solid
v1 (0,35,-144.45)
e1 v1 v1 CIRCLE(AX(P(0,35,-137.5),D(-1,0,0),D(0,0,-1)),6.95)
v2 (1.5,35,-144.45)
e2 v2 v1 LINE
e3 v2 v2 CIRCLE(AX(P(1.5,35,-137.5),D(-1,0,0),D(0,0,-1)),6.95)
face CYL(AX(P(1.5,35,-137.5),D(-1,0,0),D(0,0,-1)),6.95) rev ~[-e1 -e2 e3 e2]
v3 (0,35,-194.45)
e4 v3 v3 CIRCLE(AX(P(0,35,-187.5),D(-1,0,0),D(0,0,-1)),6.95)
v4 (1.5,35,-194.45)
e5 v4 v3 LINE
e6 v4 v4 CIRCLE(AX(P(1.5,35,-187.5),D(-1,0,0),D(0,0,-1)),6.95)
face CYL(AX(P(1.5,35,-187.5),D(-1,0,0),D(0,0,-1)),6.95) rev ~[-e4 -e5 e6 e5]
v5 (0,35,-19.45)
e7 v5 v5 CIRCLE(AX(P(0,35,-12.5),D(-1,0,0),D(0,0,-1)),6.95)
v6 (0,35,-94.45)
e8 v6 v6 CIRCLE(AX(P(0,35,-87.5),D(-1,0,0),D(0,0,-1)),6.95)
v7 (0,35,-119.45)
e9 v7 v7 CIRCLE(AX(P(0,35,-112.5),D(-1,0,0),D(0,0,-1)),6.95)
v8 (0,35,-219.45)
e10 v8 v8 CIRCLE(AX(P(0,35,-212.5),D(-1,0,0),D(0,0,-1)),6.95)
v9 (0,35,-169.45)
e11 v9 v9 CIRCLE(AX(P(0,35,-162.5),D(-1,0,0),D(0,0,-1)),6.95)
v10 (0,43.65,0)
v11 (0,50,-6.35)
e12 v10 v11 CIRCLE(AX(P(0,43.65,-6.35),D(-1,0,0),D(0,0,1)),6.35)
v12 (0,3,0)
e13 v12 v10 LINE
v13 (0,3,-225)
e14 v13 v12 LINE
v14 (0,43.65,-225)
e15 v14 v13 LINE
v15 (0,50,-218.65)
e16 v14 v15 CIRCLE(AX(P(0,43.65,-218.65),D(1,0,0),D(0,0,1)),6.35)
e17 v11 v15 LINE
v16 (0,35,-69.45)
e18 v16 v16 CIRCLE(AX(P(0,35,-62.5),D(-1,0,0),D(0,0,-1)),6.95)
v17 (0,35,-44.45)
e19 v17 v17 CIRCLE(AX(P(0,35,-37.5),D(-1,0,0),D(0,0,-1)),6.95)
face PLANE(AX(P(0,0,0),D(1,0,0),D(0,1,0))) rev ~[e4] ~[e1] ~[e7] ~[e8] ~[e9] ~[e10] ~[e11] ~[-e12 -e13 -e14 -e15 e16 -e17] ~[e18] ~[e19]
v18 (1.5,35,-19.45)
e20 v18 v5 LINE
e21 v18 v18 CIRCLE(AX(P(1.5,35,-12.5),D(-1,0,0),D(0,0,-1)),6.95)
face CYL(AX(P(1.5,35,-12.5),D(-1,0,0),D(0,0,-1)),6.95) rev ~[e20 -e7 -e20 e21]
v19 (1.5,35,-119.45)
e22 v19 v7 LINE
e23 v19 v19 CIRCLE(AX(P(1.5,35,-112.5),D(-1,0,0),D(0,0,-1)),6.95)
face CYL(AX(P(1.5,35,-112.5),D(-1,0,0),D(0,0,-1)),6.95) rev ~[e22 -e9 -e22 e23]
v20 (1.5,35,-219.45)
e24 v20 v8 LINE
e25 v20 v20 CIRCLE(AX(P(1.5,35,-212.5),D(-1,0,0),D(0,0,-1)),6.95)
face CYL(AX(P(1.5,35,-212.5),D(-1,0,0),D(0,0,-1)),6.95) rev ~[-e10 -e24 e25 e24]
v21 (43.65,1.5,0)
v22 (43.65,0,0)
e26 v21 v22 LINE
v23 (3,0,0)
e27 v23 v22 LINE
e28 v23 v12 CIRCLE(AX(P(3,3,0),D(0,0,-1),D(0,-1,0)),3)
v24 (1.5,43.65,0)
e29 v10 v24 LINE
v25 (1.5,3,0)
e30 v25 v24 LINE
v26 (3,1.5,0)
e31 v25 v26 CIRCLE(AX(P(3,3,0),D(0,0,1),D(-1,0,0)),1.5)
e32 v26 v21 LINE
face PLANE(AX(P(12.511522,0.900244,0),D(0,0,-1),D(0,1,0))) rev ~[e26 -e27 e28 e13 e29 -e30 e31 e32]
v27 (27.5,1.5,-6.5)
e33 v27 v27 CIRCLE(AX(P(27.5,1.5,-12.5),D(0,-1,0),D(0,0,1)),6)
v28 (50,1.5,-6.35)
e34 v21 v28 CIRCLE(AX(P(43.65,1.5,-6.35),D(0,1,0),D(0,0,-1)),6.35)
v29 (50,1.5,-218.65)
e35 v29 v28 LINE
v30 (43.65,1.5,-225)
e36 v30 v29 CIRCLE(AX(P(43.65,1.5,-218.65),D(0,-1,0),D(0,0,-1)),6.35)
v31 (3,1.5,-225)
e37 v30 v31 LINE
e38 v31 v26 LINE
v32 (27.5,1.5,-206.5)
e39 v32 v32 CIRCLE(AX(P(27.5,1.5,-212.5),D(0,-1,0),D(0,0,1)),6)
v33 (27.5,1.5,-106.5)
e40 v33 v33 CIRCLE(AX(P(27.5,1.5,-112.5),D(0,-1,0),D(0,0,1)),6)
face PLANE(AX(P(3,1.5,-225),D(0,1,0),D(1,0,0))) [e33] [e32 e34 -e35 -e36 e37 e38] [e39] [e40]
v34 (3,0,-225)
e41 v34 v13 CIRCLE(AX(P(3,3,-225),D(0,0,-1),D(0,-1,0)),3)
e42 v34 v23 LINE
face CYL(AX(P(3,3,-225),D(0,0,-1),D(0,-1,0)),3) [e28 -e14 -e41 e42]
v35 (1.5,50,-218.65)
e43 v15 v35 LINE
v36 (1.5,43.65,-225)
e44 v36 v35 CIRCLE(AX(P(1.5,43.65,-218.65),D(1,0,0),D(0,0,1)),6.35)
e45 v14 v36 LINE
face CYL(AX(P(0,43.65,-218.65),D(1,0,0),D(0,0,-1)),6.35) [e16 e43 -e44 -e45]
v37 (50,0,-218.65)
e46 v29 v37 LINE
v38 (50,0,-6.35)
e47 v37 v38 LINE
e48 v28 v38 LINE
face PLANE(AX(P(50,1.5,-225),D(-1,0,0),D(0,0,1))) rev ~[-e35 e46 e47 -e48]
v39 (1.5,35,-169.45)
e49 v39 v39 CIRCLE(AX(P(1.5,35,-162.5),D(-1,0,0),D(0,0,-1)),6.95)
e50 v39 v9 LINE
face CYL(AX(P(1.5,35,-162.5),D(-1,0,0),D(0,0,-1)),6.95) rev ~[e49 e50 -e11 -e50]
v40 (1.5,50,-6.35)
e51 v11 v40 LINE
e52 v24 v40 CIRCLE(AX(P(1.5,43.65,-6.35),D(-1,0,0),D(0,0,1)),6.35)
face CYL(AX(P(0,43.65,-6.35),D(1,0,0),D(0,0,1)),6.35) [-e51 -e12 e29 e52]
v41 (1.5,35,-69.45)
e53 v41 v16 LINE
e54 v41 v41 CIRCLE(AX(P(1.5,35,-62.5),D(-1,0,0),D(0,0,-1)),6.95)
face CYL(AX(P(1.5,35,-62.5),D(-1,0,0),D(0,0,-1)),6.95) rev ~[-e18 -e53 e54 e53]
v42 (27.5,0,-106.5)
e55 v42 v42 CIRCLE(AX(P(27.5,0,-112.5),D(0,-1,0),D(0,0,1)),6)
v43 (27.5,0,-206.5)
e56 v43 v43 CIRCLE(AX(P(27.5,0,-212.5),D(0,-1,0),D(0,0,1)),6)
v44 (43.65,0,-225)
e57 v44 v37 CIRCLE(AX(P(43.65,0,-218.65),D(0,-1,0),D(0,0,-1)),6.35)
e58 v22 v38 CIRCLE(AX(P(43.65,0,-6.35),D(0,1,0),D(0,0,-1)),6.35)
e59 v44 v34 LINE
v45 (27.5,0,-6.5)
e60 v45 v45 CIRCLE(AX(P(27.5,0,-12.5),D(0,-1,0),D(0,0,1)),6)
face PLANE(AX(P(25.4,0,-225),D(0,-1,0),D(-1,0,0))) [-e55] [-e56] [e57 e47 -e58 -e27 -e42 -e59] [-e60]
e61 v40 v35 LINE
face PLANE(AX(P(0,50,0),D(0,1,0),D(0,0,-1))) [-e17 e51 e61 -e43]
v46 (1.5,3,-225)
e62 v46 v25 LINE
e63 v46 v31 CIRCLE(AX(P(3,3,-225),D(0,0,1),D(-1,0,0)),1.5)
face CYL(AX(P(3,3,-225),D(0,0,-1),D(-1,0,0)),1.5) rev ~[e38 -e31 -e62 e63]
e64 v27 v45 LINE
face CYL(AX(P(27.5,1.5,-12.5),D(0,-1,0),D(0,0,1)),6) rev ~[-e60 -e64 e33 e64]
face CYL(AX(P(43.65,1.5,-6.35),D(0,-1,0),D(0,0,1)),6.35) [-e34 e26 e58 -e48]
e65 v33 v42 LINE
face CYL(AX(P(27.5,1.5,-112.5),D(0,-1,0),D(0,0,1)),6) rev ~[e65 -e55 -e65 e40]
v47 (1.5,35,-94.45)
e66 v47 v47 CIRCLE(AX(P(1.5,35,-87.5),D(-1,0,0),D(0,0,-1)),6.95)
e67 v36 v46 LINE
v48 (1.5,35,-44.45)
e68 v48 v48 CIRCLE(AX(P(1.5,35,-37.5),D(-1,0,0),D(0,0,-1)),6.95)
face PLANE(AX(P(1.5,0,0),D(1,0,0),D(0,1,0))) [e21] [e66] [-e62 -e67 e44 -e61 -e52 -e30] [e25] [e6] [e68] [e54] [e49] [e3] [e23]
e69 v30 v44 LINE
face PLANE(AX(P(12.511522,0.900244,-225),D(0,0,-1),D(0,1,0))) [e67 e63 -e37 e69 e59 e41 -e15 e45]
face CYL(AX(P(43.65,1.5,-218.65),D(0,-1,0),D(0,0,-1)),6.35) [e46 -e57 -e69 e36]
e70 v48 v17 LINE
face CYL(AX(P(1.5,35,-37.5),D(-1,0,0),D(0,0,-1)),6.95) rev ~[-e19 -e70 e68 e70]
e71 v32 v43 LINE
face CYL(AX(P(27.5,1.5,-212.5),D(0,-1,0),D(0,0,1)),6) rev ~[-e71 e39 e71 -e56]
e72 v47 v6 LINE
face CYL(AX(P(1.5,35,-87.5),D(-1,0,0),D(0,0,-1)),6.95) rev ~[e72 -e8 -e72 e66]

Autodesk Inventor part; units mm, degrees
ref_plane "YZ Plane" through (0, 0, 0) normal (1, 0, 0) x (0, 1, 0)
ref_plane "XZ Plane" through (0, 0, 0) normal (0, 1, 0) x (-1, 0, 0)
ref_plane "XY Plane" through (0, 0, 0) normal (0, 0, 1) x (1, 0, 0)
sketch "Sketch2" plane through (0, 0, 0) normal (1, 0, 0) x (0, 1, 0)
  line L0 (0, 0) -> (50, 0)
  line L1 (50, 0) -> (50, -225)
  line L2 (50, -225) -> (0, -225)
  line L3 (0, -225) -> (0, 0)
  dimension "d0" = 50
  dimension "d1" = 225
extrude "Plate1" add sketch "Sketch2" along normal blind 1.5
sketch "Sketch3" plane through (0, 1.5, -225) normal (0, -1, 0) x (1, 0, 0)
  line L0 (0, 225) -> (0, 0)
  line L1 (0, 0) -> (25.4, 0)
  line L2 (25.4, 0) -> (25.4, 225)
  line L3 (25.4, 225) -> (0, 225)
edge flange "Flange1" height 25.4 angle 90 thickness 1.5 bend radius 1.5 thickness toward (0, -1, 0) relief tear relief width 1.5 relief depth 0.75 edges at (1.5, 0, -112.5) wall of the first edge with corners at (0, 1.5, 0) (0, 1.5, -225) (25.4, 1.5, -225) (25.4, 1.5, 0)
bend "Bend1"
corner "Corner1"
sketch "Sketch4" plane through (25.4, 1.5, 0) normal (0, 1, 0) x (1, 0, 0)
  line L0 (-25.4, 0) -> (24.6, 0)
  line L1 (-22.4, 0) -> (0, 0)
  line L2 (-25.4, 0) -> (24.6, 0) construction
  line L3 (0, 225) -> (-22.4, 225)
  line L4 (24.6, 0) -> (-22.4, 0)
  line L5 (-22.4, 0) -> (-22.4, 225)
  line L6 (-22.4, 225) -> (24.6, 225)
  line L7 (24.6, 225) -> (24.6, 0)
  dimension "d13" = 50
  dimension "d14" = 0
sheet face with bend "Face2" sketch "Sketch4" thickness 1.5 toward (0, -1, 0) bend radius 1.5
bend "Bend2"
sketch "Sketch5" plane through (0, 50, 0) normal (0, 0, 1) x (1, 0, 0)
  point P0 (0, -50)
sketch "Sketch6" plane through (3, 1.5, 0) normal (0, 1, 0) x (1, 0, 0)
  line L0 (47, 225) -> (47, 0) projected
  line L1 (0, 0) -> (47, 0) projected
  line L2 (47, 225) -> (24.5, 225)
  line L3 (24.5, 225) -> (24.5, 0)
  line L4 (24.5, 0) -> (47, 0)
  line L5 (47, 0) -> (47, 225)
  circle A0 centre (24.5, 112.5) radius 6
  line L6 (24.5, 112.5) -> (24.5, 12.5)
  line L7 (24.5, 112.5) -> (124.5, 112.5) construction
  line L8 (24.5, 112.5) -> (24.5, 212.5)
  line L9 (24.5, 112.5) -> (124.5, 112.5) construction
  circle A1 centre (24.5, 212.5) radius 6
  circle A2 centre (24.5, 12.5) radius 6
  point P0 (-3, 0)
  dimension "d20" = 22.5
  dimension "d21" = 12
  dimension "d22" = 100
  dimension "d23" = 90
  dimension "d24" = 100
  dimension "d25" = 90
  dimension "d26" = 12
  dimension "d27" = 12
hole "Hole1" at (27.5, 1.5, -12.5) at (27.5, 1.5, -112.5) at (27.5, 1.5, -212.5) direction (0, -1, 0) diameter 12 end through all clearance for "Flat Head Machine Screw" size "M10" standard "Ansi Metric M Profile"
fillet "Corner Round1" radius 6.35 4 edges at (50, 0.75, 0) (50, 0.75, -225) (0.75, 50, -225) (0.75, 50, 0)
sketch "Sketch7" plane through (1.5, 0, 0) normal (1, 0, 0) x (0, 0, -1)
  arc A0 (6.35, 50) -> (0, 43.65) centre (6.35, 43.65) ccw projected
  circle A1 centre (112.5, 35) radius 6.95
  line L0 (112.5, 35) -> (87.5, 35)
  line L1 (87.5, 35) -> (62.5, 35)
  line L2 (62.5, 35) -> (37.5, 35)
  line L3 (37.5, 35) -> (12.5, 35)
  circle A2 centre (12.5, 35) radius 6.95
  circle A3 centre (37.5, 35) radius 6.95
  circle A4 centre (62.5, 35) radius 6.95
  circle A5 centre (87.5, 35) radius 6.95
  line L4 (112.5, 35) -> (137.5, 35)
  line L5 (137.5, 35) -> (162.5, 35)
  line L6 (162.5, 35) -> (187.5, 35)
  line L7 (187.5, 35) -> (212.5, 35)
  circle A6 centre (137.5, 35) radius 6.95
  circle A7 centre (162.5, 35) radius 6.95
  circle A8 centre (187.5, 35) radius 6.95
  circle A9 centre (212.5, 35) radius 6.95
  point P0 (0, 0)
  dimension "d38" = 13.9
  dimension "d43" = 25
  dimension "d44" = 25
  dimension "d45" = 25
  dimension "d46" = 25
  dimension "d47" = 13.9
  dimension "d48" = 13.9
  dimension "d49" = 13.9
  dimension "d50" = 13.9
  dimension "d51" = 25
  dimension "d52" = 25
  dimension "d53" = 25
  dimension "d54" = 180
  dimension "d55" = 25
  dimension "d56" = 13.9
  dimension "d57" = 13.9
  dimension "d58" = 13.9
  dimension "d59" = 13.9
hole "Hole2" at (1.5, 35, -12.5) at (1.5, 35, -37.5) at (1.5, 35, -62.5) at (1.5, 35, -87.5) at (1.5, 35, -112.5) at (1.5, 35, -137.5) at (1.5, 35, -162.5) at (1.5, 35, -187.5) at (1.5, 35, -212.5) direction (-1, 0, 0) diameter 13.9 end through all
equation "\"d2\" = Thickness"
equation "\"d3\" = BendReliefWidth"
equation "\"d4\" = BendReliefDepth"
equation "\"d5\" = MinimumRemnant"
equation "\"d6\" = TransitionRadius"
equation "\"d9\" = BendRadius"
equation "\"d10\" = CornerReliefSize"
equation "\"d11\" = GapSize"
equation "\"d12\" = JacobiRadiusSize"
equation "\"d15\" = BendRadius"
equation "\"d16\" = BendReliefWidth"
equation "\"d18\" = MinimumRemnant"
equation "\"d17\" = BendReliefDepth"
equation "\"d19\" = TransitionRadius"
equation "\"BendRadius\" = Thickness"
equation "\"BendReliefWidth\" = Thickness"
equation "\"BendReliefDepth\" = 0.5 * Thickness"
equation "\"CornerReliefSize\" = 4 * Thickness"
equation "\"MinimumRemnant\" = 2 * Thickness"
equation "\"TransitionRadius\" = BendRadius"
equation "\"JacobiRadiusSize\" = BendRadius"
equation "\"GapSize\" = Thickness"
equation "\"Thickness\" = 1.5"
properties part number "Mounting_bracket"
